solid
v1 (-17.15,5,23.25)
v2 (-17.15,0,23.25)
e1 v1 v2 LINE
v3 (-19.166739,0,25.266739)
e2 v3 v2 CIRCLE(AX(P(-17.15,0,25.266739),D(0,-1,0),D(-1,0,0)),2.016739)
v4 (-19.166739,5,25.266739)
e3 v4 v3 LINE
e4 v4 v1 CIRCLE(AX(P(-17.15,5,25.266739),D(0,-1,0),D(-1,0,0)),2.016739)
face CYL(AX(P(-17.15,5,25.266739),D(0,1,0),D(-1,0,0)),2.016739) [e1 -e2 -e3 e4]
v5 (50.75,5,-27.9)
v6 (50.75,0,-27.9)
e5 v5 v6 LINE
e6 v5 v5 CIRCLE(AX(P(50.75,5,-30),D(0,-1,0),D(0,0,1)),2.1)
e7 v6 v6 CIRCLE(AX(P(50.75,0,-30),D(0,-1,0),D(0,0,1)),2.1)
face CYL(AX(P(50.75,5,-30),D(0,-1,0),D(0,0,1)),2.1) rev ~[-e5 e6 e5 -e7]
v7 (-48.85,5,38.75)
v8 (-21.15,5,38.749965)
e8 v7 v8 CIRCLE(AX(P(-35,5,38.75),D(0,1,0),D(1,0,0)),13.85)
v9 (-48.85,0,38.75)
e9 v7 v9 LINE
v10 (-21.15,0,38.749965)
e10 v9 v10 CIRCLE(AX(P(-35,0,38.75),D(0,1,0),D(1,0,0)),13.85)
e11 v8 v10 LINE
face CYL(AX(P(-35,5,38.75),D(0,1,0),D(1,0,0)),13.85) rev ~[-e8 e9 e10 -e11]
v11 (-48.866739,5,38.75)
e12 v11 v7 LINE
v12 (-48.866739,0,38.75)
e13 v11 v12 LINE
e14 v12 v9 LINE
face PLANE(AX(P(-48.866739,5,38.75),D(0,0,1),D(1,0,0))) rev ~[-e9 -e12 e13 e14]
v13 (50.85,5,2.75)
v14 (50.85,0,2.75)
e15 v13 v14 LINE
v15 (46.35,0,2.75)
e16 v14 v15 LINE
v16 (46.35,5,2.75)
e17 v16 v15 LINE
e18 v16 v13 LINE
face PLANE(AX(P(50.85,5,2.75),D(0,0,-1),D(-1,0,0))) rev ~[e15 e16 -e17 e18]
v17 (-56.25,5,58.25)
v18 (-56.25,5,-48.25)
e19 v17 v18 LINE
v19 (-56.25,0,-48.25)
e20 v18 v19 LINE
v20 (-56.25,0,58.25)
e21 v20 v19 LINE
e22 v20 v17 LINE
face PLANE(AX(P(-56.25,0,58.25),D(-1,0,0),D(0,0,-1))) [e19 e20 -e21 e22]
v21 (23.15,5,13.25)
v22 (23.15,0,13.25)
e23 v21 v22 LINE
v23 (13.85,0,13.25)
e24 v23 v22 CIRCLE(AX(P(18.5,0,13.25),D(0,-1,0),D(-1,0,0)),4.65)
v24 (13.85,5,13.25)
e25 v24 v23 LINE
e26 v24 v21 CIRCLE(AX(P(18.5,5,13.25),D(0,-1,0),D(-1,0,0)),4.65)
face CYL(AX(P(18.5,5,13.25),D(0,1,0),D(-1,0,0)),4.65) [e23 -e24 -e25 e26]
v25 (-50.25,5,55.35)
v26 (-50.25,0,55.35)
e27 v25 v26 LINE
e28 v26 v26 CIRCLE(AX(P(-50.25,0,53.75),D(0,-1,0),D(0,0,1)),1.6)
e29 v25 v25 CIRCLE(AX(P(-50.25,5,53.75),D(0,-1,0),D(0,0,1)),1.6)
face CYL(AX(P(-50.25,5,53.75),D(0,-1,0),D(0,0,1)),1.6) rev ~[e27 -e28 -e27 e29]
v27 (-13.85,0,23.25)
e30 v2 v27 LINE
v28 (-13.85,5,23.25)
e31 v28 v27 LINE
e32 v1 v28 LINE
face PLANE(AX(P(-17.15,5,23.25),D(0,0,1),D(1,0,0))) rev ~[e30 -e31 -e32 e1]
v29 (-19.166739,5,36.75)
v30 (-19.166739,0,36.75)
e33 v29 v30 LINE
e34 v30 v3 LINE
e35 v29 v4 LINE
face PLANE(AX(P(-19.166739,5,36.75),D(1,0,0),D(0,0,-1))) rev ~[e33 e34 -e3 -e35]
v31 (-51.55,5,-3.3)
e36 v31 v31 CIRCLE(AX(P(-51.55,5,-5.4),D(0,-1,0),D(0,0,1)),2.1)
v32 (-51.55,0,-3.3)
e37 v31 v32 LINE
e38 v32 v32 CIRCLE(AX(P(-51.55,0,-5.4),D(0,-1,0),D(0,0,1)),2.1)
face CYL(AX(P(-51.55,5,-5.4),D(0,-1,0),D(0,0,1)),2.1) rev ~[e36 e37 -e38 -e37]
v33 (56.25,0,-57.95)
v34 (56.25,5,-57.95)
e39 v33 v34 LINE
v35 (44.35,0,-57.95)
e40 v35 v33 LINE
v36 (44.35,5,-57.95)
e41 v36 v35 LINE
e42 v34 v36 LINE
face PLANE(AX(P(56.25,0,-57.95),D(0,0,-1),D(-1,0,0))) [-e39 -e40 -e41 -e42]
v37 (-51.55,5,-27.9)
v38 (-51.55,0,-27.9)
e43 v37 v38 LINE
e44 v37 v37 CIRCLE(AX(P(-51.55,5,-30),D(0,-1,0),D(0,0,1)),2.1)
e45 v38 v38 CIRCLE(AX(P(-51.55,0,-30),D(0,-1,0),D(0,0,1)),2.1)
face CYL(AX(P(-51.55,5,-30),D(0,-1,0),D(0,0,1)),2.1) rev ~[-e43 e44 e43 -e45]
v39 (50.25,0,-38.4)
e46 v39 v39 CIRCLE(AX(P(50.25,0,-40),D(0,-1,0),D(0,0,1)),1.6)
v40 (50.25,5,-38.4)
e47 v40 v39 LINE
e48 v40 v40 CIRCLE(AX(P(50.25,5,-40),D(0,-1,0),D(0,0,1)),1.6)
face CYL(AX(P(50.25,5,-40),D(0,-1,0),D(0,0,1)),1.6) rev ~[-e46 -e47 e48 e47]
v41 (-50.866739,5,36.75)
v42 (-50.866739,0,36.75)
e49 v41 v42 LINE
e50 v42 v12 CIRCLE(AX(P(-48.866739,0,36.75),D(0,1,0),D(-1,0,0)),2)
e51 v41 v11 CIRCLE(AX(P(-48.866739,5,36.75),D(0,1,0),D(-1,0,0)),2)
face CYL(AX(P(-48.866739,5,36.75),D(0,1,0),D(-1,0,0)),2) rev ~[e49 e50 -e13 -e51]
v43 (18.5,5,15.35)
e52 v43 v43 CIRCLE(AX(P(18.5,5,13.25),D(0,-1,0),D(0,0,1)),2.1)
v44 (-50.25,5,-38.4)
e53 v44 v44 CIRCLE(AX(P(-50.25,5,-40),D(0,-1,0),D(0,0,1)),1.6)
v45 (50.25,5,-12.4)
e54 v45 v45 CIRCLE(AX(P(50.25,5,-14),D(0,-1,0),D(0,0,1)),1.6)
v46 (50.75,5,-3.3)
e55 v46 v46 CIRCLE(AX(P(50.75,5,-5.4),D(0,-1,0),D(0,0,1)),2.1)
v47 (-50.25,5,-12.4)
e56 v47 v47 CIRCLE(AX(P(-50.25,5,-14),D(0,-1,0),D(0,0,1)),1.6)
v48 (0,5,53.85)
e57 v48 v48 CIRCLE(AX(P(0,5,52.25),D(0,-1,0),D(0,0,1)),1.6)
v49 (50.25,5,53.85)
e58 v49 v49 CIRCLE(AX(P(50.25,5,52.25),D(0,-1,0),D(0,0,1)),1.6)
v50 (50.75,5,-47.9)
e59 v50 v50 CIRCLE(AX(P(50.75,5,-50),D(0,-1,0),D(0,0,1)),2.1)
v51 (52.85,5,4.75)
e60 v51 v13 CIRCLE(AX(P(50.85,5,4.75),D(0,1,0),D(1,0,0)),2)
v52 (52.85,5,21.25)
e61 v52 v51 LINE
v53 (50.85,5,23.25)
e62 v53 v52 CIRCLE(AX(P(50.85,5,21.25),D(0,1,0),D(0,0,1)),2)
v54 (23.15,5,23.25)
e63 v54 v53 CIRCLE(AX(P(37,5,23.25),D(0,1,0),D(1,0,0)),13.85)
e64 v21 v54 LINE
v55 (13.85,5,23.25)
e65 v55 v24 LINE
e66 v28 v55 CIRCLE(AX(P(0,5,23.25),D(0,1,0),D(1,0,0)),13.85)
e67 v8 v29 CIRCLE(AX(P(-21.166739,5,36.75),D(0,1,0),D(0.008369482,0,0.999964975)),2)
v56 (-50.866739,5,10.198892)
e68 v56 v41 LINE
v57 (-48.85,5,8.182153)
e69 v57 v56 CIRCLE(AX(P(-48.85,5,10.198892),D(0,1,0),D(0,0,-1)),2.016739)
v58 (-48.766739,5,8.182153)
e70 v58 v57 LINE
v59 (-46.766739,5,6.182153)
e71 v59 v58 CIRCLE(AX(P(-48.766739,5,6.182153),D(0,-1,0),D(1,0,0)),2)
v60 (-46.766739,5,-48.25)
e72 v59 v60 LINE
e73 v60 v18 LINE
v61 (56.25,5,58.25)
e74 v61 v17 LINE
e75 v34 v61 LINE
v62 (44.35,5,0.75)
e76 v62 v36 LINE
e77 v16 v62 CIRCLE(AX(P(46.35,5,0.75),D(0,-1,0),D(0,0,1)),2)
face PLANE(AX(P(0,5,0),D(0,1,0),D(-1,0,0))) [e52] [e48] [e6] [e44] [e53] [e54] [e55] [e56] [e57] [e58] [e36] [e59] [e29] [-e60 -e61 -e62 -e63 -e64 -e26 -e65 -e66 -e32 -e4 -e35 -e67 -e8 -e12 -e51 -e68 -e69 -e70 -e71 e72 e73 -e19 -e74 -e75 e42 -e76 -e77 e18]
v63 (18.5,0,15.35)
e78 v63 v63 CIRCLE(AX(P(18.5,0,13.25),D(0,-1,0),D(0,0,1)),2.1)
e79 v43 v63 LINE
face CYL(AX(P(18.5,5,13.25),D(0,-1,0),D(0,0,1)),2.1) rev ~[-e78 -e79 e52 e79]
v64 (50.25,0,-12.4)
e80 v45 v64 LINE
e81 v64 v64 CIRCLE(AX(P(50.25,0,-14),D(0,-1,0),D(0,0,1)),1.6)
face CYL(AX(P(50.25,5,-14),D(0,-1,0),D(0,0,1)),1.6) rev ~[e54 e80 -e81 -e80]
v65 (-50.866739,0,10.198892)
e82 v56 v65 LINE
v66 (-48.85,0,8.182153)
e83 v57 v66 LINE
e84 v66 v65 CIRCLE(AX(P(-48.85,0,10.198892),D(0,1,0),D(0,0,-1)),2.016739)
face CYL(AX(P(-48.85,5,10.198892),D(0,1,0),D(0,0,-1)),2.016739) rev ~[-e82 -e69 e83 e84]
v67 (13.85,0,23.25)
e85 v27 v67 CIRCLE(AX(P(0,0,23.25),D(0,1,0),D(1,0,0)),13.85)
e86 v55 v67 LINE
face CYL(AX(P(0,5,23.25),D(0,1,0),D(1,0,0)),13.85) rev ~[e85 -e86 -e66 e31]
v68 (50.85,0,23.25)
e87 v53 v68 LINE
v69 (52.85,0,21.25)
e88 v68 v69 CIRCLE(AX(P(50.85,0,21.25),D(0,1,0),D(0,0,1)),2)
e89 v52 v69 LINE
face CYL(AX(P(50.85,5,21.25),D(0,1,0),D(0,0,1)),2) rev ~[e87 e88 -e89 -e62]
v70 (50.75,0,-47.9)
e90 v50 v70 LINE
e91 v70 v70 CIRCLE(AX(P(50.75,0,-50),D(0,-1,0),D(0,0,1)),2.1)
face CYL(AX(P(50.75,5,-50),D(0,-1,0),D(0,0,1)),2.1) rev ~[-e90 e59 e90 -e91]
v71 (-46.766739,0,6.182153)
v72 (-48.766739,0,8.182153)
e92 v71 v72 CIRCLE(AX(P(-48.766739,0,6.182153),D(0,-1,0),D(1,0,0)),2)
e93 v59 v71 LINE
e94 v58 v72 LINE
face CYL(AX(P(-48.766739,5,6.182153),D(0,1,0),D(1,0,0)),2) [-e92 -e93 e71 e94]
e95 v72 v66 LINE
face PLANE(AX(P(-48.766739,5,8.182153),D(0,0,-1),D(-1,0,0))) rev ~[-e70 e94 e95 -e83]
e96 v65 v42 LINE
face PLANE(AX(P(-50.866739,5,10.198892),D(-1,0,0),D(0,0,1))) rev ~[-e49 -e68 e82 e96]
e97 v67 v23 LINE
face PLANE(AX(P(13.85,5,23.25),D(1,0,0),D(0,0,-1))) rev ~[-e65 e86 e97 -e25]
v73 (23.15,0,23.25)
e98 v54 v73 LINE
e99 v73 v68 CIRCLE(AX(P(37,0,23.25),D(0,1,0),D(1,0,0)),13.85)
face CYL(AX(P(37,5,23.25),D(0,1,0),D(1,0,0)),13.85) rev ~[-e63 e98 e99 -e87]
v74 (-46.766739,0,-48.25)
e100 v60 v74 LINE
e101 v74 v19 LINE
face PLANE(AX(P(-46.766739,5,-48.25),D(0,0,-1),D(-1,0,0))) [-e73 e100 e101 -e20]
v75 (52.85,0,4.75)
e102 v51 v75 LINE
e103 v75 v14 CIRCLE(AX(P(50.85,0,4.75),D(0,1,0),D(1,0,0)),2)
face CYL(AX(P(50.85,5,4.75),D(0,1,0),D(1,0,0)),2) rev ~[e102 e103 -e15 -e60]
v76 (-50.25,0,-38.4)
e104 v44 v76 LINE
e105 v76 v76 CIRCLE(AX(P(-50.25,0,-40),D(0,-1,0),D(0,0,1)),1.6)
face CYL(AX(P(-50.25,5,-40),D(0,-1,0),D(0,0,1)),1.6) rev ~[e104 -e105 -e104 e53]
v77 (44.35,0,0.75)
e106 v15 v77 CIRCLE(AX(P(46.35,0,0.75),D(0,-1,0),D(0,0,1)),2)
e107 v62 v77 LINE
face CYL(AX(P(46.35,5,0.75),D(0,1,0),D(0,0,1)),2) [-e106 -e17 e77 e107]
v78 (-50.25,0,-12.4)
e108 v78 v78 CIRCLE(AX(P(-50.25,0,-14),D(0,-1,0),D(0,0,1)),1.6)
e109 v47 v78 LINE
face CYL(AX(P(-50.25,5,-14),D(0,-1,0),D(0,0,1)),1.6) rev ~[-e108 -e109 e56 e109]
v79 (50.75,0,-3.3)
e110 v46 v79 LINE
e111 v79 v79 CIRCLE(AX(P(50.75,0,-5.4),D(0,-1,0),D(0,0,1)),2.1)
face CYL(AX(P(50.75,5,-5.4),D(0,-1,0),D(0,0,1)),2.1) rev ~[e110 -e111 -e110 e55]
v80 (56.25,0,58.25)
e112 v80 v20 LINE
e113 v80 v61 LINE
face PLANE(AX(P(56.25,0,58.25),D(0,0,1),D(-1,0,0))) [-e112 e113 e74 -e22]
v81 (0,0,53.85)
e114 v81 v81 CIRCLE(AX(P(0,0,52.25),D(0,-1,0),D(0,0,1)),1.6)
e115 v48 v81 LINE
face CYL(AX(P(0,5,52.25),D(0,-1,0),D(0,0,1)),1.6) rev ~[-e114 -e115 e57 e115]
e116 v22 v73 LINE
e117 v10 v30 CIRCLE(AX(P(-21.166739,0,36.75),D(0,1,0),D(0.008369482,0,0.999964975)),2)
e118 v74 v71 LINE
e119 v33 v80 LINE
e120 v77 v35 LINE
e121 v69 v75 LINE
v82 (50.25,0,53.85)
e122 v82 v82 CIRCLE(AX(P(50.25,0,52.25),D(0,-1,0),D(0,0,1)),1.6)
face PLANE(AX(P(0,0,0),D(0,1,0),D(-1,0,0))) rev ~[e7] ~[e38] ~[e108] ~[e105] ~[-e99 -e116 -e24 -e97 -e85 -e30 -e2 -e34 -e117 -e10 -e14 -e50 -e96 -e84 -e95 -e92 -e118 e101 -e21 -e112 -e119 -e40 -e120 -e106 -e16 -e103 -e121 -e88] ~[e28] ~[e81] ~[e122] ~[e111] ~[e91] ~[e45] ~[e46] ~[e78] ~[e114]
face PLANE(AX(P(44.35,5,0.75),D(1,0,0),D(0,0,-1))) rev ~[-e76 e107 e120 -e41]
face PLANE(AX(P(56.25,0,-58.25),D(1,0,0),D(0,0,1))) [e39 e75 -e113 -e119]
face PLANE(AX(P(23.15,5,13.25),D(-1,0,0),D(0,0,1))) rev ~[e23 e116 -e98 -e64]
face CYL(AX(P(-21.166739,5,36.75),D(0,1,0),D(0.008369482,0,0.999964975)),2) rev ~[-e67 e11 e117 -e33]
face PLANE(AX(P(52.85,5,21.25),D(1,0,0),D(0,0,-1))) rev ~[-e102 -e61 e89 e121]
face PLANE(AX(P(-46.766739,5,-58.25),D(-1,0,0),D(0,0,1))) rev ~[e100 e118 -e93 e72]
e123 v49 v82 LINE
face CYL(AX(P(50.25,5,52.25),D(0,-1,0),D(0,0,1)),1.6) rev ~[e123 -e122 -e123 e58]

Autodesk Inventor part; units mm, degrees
ref_plane "YZ Plane" through (0, 0, 0) normal (1, 0, 0) x (0, 1, 0)
ref_plane "XZ Plane" through (0, 0, 0) normal (0, 1, 0) x (-1, 0, 0)
ref_plane "XY Plane" through (0, 0, 0) normal (0, 0, 1) x (1, 0, 0)
sketch "Sketch1" plane through (0, 0, 0) normal (0, 1, 0) x (-1, 0, 0)
  line L0 (-56.25, 58.25) -> (56.25, 58.25)
  line L1 (56.25, 58.25) -> (56.25, -58.25)
  line L2 (56.25, -58.25) -> (-56.25, -58.25)
  line L3 (-56.25, -58.25) -> (-56.25, 58.25)
  line L4 (-56.25, 58.25) -> (56.25, -58.25) construction
  line L5 (56.25, 58.25) -> (-56.25, -58.25) construction
  point P0 (0, 0)
  dimension "d0" = 112.5
  dimension "d1" = 116.5
extrude "Extrusion1" add sketch "Sketch1" along normal blind 5
sketch "Sketch2" plane through (0, 5, 0) normal (0, 1, 0) x (1, 0, 0)
  circle A0 centre (18.5, 28) radius 23.85
  circle A1 centre (37, -23.25) radius 13.85
  circle A2 centre (-35, -38.75) radius 13.85
  circle A3 centre (-30.9, 25.8) radius 13.85
  circle A4 centre (0, -23.25) radius 13.85
  line L0 (56.25, 58.25) -> (-56.25, 58.25)
  line L1 (-56.25, -58.25) -> (56.25, -58.25)
  line L2 (0, -105.929917) -> (0, 123.208568) construction
  line L3 (-76.477668, -38.75) -> (-5.35, -38.75) construction
  line L4 (-123.544744, -23.25) -> (82.557161, -23.25) construction
  line L5 (56.25, -58.25) -> (56.25, 58.25) construction
  point P0 (0, 0)
  dimension "d4" = 47.7
  dimension "d5" = 27.7
  dimension "d6" = 27.7
  dimension "d7" = 27.7
  dimension "d8" = 27.7
  dimension "d9" = 116.5
  dimension "d10" = 112.5
  dimension "d13" = 37
  dimension "d14" = 18.5
  dimension "d15" = 30.9
  dimension "d18" = 19.5
  dimension "d19" = 35
  dimension "d20" = 35
  dimension "d157" = 25.8
  dimension "d158" = 28
extrude "Extrusion2" cut sketch "Sketch2" against normal blind 5
sketch "Sketch3" plane through (0, 5, 0) normal (0, 1, 0) x (1, 0, 0)
  line L0 (-56.266739, 58.25) -> (-56.266739, -58.25) construction
  circle A0 centre (0, -23.25) radius 13.85 construction
  circle A1 centre (37, -23.25) radius 13.85 construction
  circle A2 centre (-30.916739, 25.8) radius 13.85 construction
  line L1 (56.25, 58.25) -> (-56.266739, 58.25) construction
  line L2 (-17.15, -23.25) -> (-13.85, -23.25) construction
  line L3 (-46.75, -8.182153) -> (-46.85, -8.182153)
  line L4 (-13.85, -23.25) -> (-17.15, -23.25)
  line L5 (56.25, -58.25) -> (56.25, 58.25)
  line L6 (-46.85, -8.182153) -> (-46.766739, -8.182153)
  arc A3 (-13.85, -23.25) -> (13.85, -23.25) centre (0, -23.25) ccw
  arc A4 (23.15, -23.25) -> (50.85, -23.25) centre (37, -23.25) ccw
  line L7 (-44.75, 58.25) -> (42.35, 58.25)
  line L8 (-48.866739, -40.25) -> (-48.866739, -40.25)
  line L9 (-50.866739, -38.75) -> (-50.866739, -10.198892)
  line L10 (-48.85, -8.182153) -> (-48.766739, -8.182153)
  arc A5 (-48.85, -8.182153) -> (-50.866739, -10.198892) centre (-48.85, -10.198892) ccw
  line L11 (50.85, -23.25) -> (50.85, -23.25)
  line L12 (52.85, -21.25) -> (52.85, -4.75)
  line L13 (50.85, -2.75) -> (46.35, -2.75)
  arc A6 (50.85, -23.25) -> (52.85, -21.25) centre (50.85, -21.25) ccw
  arc A7 (52.85, -4.75) -> (50.85, -2.75) centre (50.85, -4.75) ccw
  line L14 (-44.751621, 25.8) -> (-44.751621, 25.8)
  line L15 (-46.766739, 28.033923) -> (-46.766739, 58.25)
  line L16 (-44.75, 58.25) -> (-46.766739, 58.25)
  line L17 (-17.073359, 26.228188) -> (-17.056621, 26.228188)
  line L18 (-15.066739, 27.8) -> (-15.066739, 58.25)
  line L19 (-5.349992, 27.98) -> (-5.349991, 27.98)
  line L20 (-7.35, 29.979635) -> (-7.35, 58.25)
  line L21 (42.349991, 27.98) -> (42.35, 27.98)
  line L22 (44.35, 58.25) -> (42.35, 58.25)
  circle A8 centre (0, -23.25) radius 13.85
  circle A9 centre (37, -23.25) radius 13.85
  line L23 (44.35, 58.25) -> (44.35, -0.75)
  line L24 (42.35, 27.98) -> (44.35, 27.98)
  line L25 (-5.349991, 27.98) -> (-5.349999, 27.98)
  line L26 (-7.35, 29.98) -> (-7.35, 29.979635)
  line L27 (-17.056621, 26.228188) -> (-17.056621, 26.228188)
  line L28 (-46.766739, 28.033923) -> (-46.766739, -6.182153)
  arc A10 (-48.766739, -8.182153) -> (-46.766739, -6.182153) centre (-48.766739, -6.182153) ccw
  line L29 (-44.766739, 25.8) -> (-46.766739, 25.8)
  line L30 (-21.15, -40.25) -> (-21.15, -40.25)
  line L31 (-19.166739, -36.75) -> (-19.166739, -25.266739)
  arc A11 (-17.15, -23.25) -> (-19.166739, -25.266739) centre (-17.15, -25.266739) ccw
  line L32 (-17.066739, 25.8) -> (-17.066739, 25.8)
  arc A12 (-17.066739, 25.8) -> (-15.066739, 27.8) centre (-17.066739, 27.8) ccw
  line L33 (-56.266739, -58.25) -> (56.25, -58.25)
  line L34 (56.25, -58.25) -> (56.25, 58.25)
  line L35 (56.25, 58.25) -> (-56.266739, 58.25)
  line L36 (-56.266739, 58.25) -> (-56.266739, -58.25)
  circle A13 centre (-30.916739, 25.8) radius 13.85
  circle A14 centre (-30.916739, 25.8) radius 13.85
  line L37 (13.85, -23.25) -> (13.85, -13.25)
  circle A15 centre (0, -23.25) radius 13.85
  line L38 (23.15, -23.25) -> (23.15, -13.25)
  circle A16 centre (37, -23.25) radius 13.85
  arc A17 (23.15, -13.25) -> (13.85, -13.25) centre (18.5, -13.25) ccw
  circle A18 centre (18.5, 28) radius 23.85
  circle A19 centre (18.5, 28) radius 23.85
  line L39 (56.25, 58.25) -> (-56.266739, 58.25)
  circle A20 centre (-35, -38.75) radius 13.85
  circle A21 centre (-35, -38.75) radius 13.85
  arc A22 (44.35, -0.75) -> (46.35, -2.75) centre (46.35, -0.75) ccw
  line L40 (-5.349999, 27.98) -> (-5.35, 27.98)
  arc A23 (-7.35, 29.98) -> (-5.35, 27.98) centre (-5.35, 29.98) ccw
  line L41 (-56.266739, 58.25) -> (-56.266739, -58.25) construction
  circle A24 centre (-0.016739, -23.25) radius 13.85 construction
  circle A25 centre (36.983261, -23.25) radius 13.85 construction
  circle A26 centre (-30.916739, 25.8) radius 13.85 construction
  line L42 (56.233261, 58.25) -> (-56.266739, 58.25) construction
  line L43 (-17.166739, -23.25) -> (-13.866739, -23.25) construction
  line L44 (-46.75, -8.182153) -> (-46.85, -8.182153)
  line L45 (-13.866739, -23.25) -> (-17.166739, -23.25)
  line L46 (56.233261, -58.25) -> (56.233261, 58.25)
  line L47 (-46.866739, -8.182153) -> (-46.766739, -8.182153)
  arc A27 (-13.866739, -23.25) -> (13.833261, -23.25) centre (-0.016739, -23.25) ccw
  arc A28 (23.133261, -23.25) -> (50.833261, -23.25) centre (36.983261, -23.25) ccw
  line L48 (-44.766739, 58.25) -> (42.333261, 58.25)
  line L49 (-48.85, -40.25) -> (-48.85, -40.25)
  line L50 (-50.866739, -36.75) -> (-50.866739, -10.182153)
  line L51 (-48.866739, -8.182153) -> (-48.766739, -8.182153)
  arc A29 (-48.866739, -8.182153) -> (-50.866739, -10.182153) centre (-48.866739, -10.182153) ccw
  line L52 (50.833261, -23.25) -> (50.833261, -23.25)
  line L53 (52.833261, -21.25) -> (52.833261, -4.75)
  line L54 (50.833261, -2.75) -> (46.333261, -2.75)
  arc A30 (50.833261, -23.25) -> (52.833261, -21.25) centre (50.833261, -21.25) ccw
  arc A31 (52.833261, -4.75) -> (50.833261, -2.75) centre (50.833261, -4.75) ccw
  line L55 (-44.76836, 25.8) -> (-44.76836, 25.8)
  line L56 (-46.766739, 28.033923) -> (-46.766739, 58.25)
  line L57 (-44.766739, 58.25) -> (-46.766739, 58.25)
  line L58 (-17.073359, 26.228188) -> (-17.073359, 26.228188)
  line L59 (-15.066739, 27.8) -> (-15.066739, 58.25)
  line L60 (-5.36673, 27.98) -> (-5.366729, 27.98)
  line L61 (-7.366739, 29.979635) -> (-7.366739, 58.25)
  line L62 (42.333252, 27.98) -> (42.333261, 27.98)
  line L63 (44.333261, 58.25) -> (42.333261, 58.25)
  circle A32 centre (-0.016739, -23.25) radius 13.85
  circle A33 centre (36.983261, -23.25) radius 13.85
  line L64 (44.333261, 58.25) -> (44.333261, -0.75)
  line L65 (42.333261, 27.98) -> (44.333261, 27.98)
  line L66 (-5.366729, 27.98) -> (-5.366738, 27.98)
  line L67 (-7.366739, 29.98) -> (-7.366739, 29.979635)
  line L68 (-17.073359, 26.228188) -> (-17.073359, 26.228188)
  line L69 (-15.066739, 28.002891) -> (-15.066739, 28.002891)
  line L70 (-46.766739, 28.033923) -> (-46.766739, -6.182153)
  arc A34 (-48.766739, -8.182153) -> (-46.766739, -6.182153) centre (-48.766739, -6.182153) ccw
  line L71 (-44.766739, 25.8) -> (-46.766739, 25.8)
  line L72 (-21.15, -40.25) -> (-21.15, -40.25)
  line L73 (-19.166739, -38.25) -> (-19.166739, -25.25)
  arc A35 (-17.166739, -23.25) -> (-19.166739, -25.25) centre (-17.166739, -25.25) ccw
  line L74 (-17.066739, 25.8) -> (-17.066739, 25.8)
  arc A36 (-17.066739, 25.8) -> (-15.066739, 27.8) centre (-17.066739, 27.8) ccw
  line L75 (-56.266739, -58.25) -> (56.233261, -58.25)
  line L76 (56.233261, -58.25) -> (56.233261, 58.25)
  line L77 (56.233261, 58.25) -> (-56.266739, 58.25)
  line L78 (-56.266739, 58.25) -> (-56.266739, -58.25)
  circle A37 centre (-30.9, 25.8) radius 13.833261
  circle A38 centre (-30.9, 25.8) radius 13.833261
  line L79 (13.833261, -23.25) -> (13.833261, -13.25)
  circle A39 centre (-0.016739, -23.25) radius 13.85
  line L80 (23.133261, -23.25) -> (23.133261, -13.25)
  circle A40 centre (36.983261, -23.25) radius 13.85
  arc A41 (23.133261, -13.25) -> (13.833261, -13.25) centre (18.483261, -13.25) ccw
  circle A42 centre (18.483261, 28) radius 23.85
  circle A43 centre (18.483261, 28) radius 23.85
  line L81 (56.233261, 58.25) -> (-56.266739, 58.25)
  circle A44 centre (-35, -38.75) radius 13.85
  arc A45 (44.333261, -0.75) -> (46.333261, -2.75) centre (46.333261, -0.75) ccw
  line L82 (-5.366738, 27.98) -> (-5.366739, 27.98)
  arc A46 (-7.366739, 29.98) -> (-5.366739, 27.98) centre (-5.366739, 29.98) ccw
  circle A47 centre (18.5, 28) radius 23.85
  circle A48 centre (37, -23.25) radius 13.85
  circle A49 centre (-30.9, 25.8) radius 13.85
  circle A50 centre (0, -23.25) radius 13.85
  circle A51 centre (-35, -38.75) radius 13.85
  line L83 (56.25, 58.25) -> (-56.25, 58.25)
  line L84 (-56.25, 58.25) -> (-56.25, -58.25)
  line L85 (-56.25, -58.25) -> (56.25, -58.25)
  line L86 (56.25, -58.25) -> (56.25, 58.25)
  line L87 (-48.866739, -38.75) -> (-21.166739, -38.75)
  line L88 (-56.25, 58.25) -> (-56.25, -58.25)
  line L89 (-56.25, -58.25) -> (56.25, -58.25)
  line L90 (56.25, -58.25) -> (56.25, 58.25)
  line L91 (56.25, 58.25) -> (-56.25, 58.25)
  circle A52 centre (-30.9, 25.8) radius 13.85
  circle A53 centre (18.5, 28) radius 23.85
  circle A54 centre (-35, -38.75) radius 13.85
  circle A55 centre (0, -23.25) radius 13.85
  circle A56 centre (37, -23.25) radius 13.85
  arc A57 (-21.166739, -38.75) -> (-19.166739, -36.75) centre (-21.166739, -36.75) ccw
  arc A58 (-50.866739, -36.75) -> (-48.866739, -38.75) centre (-48.866739, -36.75) ccw
  point P0 (18.5, 27.979635)
  point P1 (-30.9, 25.819804)
  point P2 (-0.016739, 0)
  point P3 (0, 0)
  point P4 (44.35, -2.75)
  point P5 (52.85, -23.25)
  point P6 (-15.066739, 28.002891)
  point P7 (-15.066739, 28.002891)
  point P8 (50.85, -23.25)
  point P9 (-19.166739, -38.25)
  point P10 (50.85, -23.25)
  point P11 (-46.75, 58.25)
  point P12 (-46.75, 58.25)
  point P13 (50.85, -23.25)
  point P14 (-44.75, 25.8)
  point P15 (-17.05, 25.8)
  point P16 (-7.35, 27.98)
  point P17 (-7.35, 29.98)
  point P18 (-21.15, -40.25)
  point P19 (-0.016739, 0)
  point P20 (-0.016739, 0)
  point P21 (44.333261, -2.75)
  point P22 (52.833261, -23.25)
  point P23 (50.85, -23.25)
  point P24 (50.85, -23.25)
  point P25 (-46.75, 58.25)
  point P26 (-46.75, 58.25)
  point P27 (50.85, -23.25)
  point P28 (-44.75, 25.8)
  point P29 (-17.05, 25.8)
  point P30 (-7.366739, 27.98)
  point P31 (-7.35, 29.98)
  point P32 (-21.15, -40.25)
  point P33 (42.35, 28)
  point P34 (-5.349998, 27.989818)
  point P35 (13.85, -23.25)
  point P36 (50.85, -23.25)
  point P37 (-30.908369, 11.950003)
  point P38 (-30.908369, 39.649997)
  point P39 (-19.166739, -38.75)
  point P40 (50.85, -23.24993)
  point P41 (-48.85, -38.75)
  point P42 (-21.15, -38.74993)
  dimension "d95" = 27.7
  dimension "d96" = 27.7
  dimension "d134" = 27.7
  dimension "d135" = 27.7
  dimension "d81" = 2
  dimension "d82" = 2
  dimension "d83" = 2
  dimension "d84" = 2
  dimension "d86" = 2
  dimension "d87" = 2
  dimension "d88" = 27.7
  dimension "d89" = 10
  dimension "d90" = 10
  dimension "d91" = 25.8
  dimension "d92" = 23.25
  dimension "d93" = 23.25
  dimension "d94" = 37
  dimension "d97" = 19.15
  dimension "d98" = 50.85
  dimension "d99" = 46.75
  dimension "d100" = 2.017
  dimension "d101" = 6.18215
  dimension "d102" = 31.7
  dimension "d103" = 51.7
  dimension "d104" = 30.9
  dimension "d105" = 3.4
  dimension "d106" = 11.9
  dimension "d107" = 61
  dimension "d108" = 47.7
  dimension "d109" = 28
  dimension "d110" = 18.5
  dimension "d111" = 30.27
  dimension "d112" = 27.7
  dimension "d113" = 2
  dimension "d114" = 30.27
  dimension "d115" = 2
  dimension "d116" = 112.51674
  dimension "d117" = 116.5
  dimension "d120" = 2
  dimension "d121" = 2
  dimension "d122" = 2
  dimension "d123" = 2
  dimension "d125" = 2
  dimension "d126" = 2
  dimension "d127" = 27.7
  dimension "d128" = 10
  dimension "d129" = 10
  dimension "d130" = 25.8
  dimension "d131" = 23.25
  dimension "d132" = 23.25
  dimension "d133" = 37
  dimension "d136" = 19.15
  dimension "d137" = 50.85
  dimension "d138" = 46.75
  dimension "d139" = 2
  dimension "d140" = 6.18215
  dimension "d141" = 31.7
  dimension "d142" = 51.7
  dimension "d143" = 30.88326
  dimension "d144" = 3.4
  dimension "d145" = 11.9
  dimension "d146" = 61
  dimension "d147" = 47.7
  dimension "d148" = 28
  dimension "d149" = 18.5
  dimension "d150" = 30.27
  dimension "d152" = 2
  dimension "d153" = 30.27
sketch "Sketch3 outline for Extrusion3" plane through (0, 5, 0) normal (0, 1, 0) x (1, 0, 0)
  arc A0 (23.15, -23.25) -> (50.85, -23.25) centre (37, -23.25) cw
  line L0 (23.15, -13.25) -> (23.15, -23.25)
  arc A1 (50.85, -23.25) -> (52.85, -21.25) centre (50.85, -21.25) ccw
  arc A2 (13.85, -13.25) -> (23.15, -13.25) centre (18.5, -13.25) cw
  line L1 (52.85, -21.25) -> (52.85, -4.75)
  line L2 (13.85, -23.25) -> (13.85, -13.25)
  arc A3 (52.85, -4.75) -> (50.85, -2.75) centre (50.85, -4.75) ccw
  arc A4 (-13.85, -23.25) -> (13.85, -23.25) centre (0, -23.25) cw
  line L3 (50.85, -2.75) -> (50.833261, -2.75)
  line L4 (-17.15, -23.25) -> (-13.85, -23.25)
  line L5 (50.833261, -2.75) -> (46.35, -2.75)
  arc A5 (-19.166739, -25.266739) -> (-17.15, -23.25) centre (-17.15, -25.266739) cw
  arc A6 (46.35, -2.75) -> (44.35, -0.75) centre (46.35, -0.75) cw
  line L6 (-19.166739, -36.75) -> (-19.166739, -25.266739)
  line L7 (44.35, -0.75) -> (44.35, 58.25)
  arc A7 (-21.15, -38.74993) -> (-19.166739, -36.75) centre (-21.166739, -36.75) ccw
  line L8 (44.35, 58.25) -> (44.333261, 58.25)
  arc A8 (-48.85, -38.75) -> (-21.15, -38.74993) centre (-35, -38.75) cw
  line L9 (44.333261, 58.25) -> (42.333261, 58.25)
  line L10 (-48.866739, -38.75) -> (-48.85, -38.75)
  line L11 (42.333261, 58.25) -> (-44.766739, 58.25)
  arc A9 (-50.866739, -36.75) -> (-48.866739, -38.75) centre (-48.866739, -36.75) ccw
  line L12 (-44.766739, 58.25) -> (-46.766739, 58.25)
  line L13 (-50.866739, -10.198892) -> (-50.866739, -36.75)
  line L14 (-46.766739, 58.25) -> (-46.766739, 28.033923)
  arc A10 (-48.85, -8.182153) -> (-50.866739, -10.198892) centre (-48.85, -10.198892) ccw
  line L15 (-46.766739, 28.033923) -> (-46.766739, -6.182153)
  line L16 (-48.766739, -8.182153) -> (-48.85, -8.182153)
  arc A11 (-46.766739, -6.182153) -> (-48.766739, -8.182153) centre (-48.766739, -6.182153) cw
  arc A12 (-30.908369, 39.649997) -> (-30.908369, 11.950003) centre (-30.916739, 25.8) cw
  arc A13 (-30.908369, 11.950003) -> (-30.908369, 39.649997) centre (-30.9, 25.8) cw
  arc A14 (-5.349998, 27.989818) -> (42.35, 28) centre (18.5, 28) cw
  arc A15 (42.35, 28) -> (-5.349998, 27.989818) centre (18.5, 28) cw
extrude "Extrusion3" cut sketch "Sketch3 outline for Extrusion3" against normal blind 5
sketch "Sketch4" plane through (0, 5, 0) normal (0, 1, 0) x (1, 0, 0)
  line L0 (-56.25, 58.25) -> (-56.25, -58.25)
  line L1 (56.25, -58.25) -> (56.25, 58.25)
  line L2 (-51.55, 5.4) -> (-51.55, 71.994123) construction
  line L3 (50.75, 5.4) -> (50.75, 69.456542) construction
  line L4 (-73.721988, 50) -> (66.546719, 50) construction
  line L5 (66.546719, 30) -> (-76.077923, 30) construction
  line L6 (18.5, -1.340599) -> (18.5, -39.445861) construction
  line L7 (6.353115, -13.25) -> (33.621097, -13.25) construction
  point P0 (0, 0)
  point P1 (-51.55, 30)
  point P2 (50.75, 50)
  point P3 (50.75, 30)
  point P4 (18.5, -13.25)
  dimension "d48" = 4.7
  dimension "d49" = 5.5
  dimension "d58" = 30
  dimension "d59" = 50
  dimension "d72" = 5.4
  dimension "d73" = 5.4
hole "Hole1" at (-51.55, 5, -5.4) at (50.75, 5, -5.4) at (-51.55, 5, -30) at (50.75, 5, -50) at (50.75, 5, -30) at (18.5, 5, 13.25) direction (0, -1, 0) diameter 4.2 end through all
sketch "Sketch5" plane through (0, 5, 0) normal (0, 1, 0) x (1, 0, 0)
  line L0 (-50.25, 75.94977) -> (-50.25, -88.006053) construction
  line L1 (-63.914485, -52.25) -> (79.409686, -52.25) construction
  line L2 (50.25, 66.292399) -> (50.25, -77.90971) construction
  line L3 (-56.25, 58.25) -> (-56.25, -58.25) construction
  line L4 (-56.25, -58.25) -> (56.25, -58.25) construction
  line L5 (56.25, -58.25) -> (56.25, 58.25) construction
  line L6 (-71.815971, 40) -> (84.238372, 40) construction
  line L7 (-70.718543, 14) -> (79.409686, 14) construction
  point P0 (0, 0)
  point P1 (-50.25, 40)
  point P2 (-50.25, 14)
  point P3 (-50.25, -53.75)
  point P4 (50.25, -52.25)
  point P5 (0, -52.25)
  point P6 (50.25, 14)
  point P7 (50.25, 40)
  dimension "d1" = 116.5
  dimension "d60" = 6
  dimension "d61" = 6
  dimension "d62" = 6
  dimension "d63" = 14
  dimension "d64" = 40
  dimension "d162" = 58.25
  dimension "d163" = 4.5
hole "Hole2" at (-50.25, 5, -40) at (-50.25, 5, -14) at (-50.25, 5, 53.75) at (50.25, 5, 52.25) at (0, 5, 52.25) at (50.25, 5, -14) at (50.25, 5, -40) direction (0, -1, 0) diameter 3.2 end through all
sketch "Sketch6" plane through (0, 5, 0) normal (0, 1, 0) x (1, 0, 0)
  line L0 (56.25, 58.25) -> (-56.25, 58.25)
  line L1 (-56.25, 58.25) -> (-46.766739, 58.25)
  line L2 (-46.766739, 58.25) -> (-46.766739, 48.25)
  line L3 (-46.766739, 48.25) -> (-56.25, 48.25)
  line L4 (-56.25, 48.25) -> (-56.25, 58.25)
  line L5 (-56.25, 58.25) -> (-56.25, -58.25)
  line L6 (-46.766739, -6.182153) -> (-46.766739, 58.25)
  point P0 (0, 0)
  point P1 (-46.75, 58.25)
  dimension "d159" = 10
extrude "Extrusion4" cut sketch "Sketch6" against normal blind 10
sketch "Sketch7" plane through (56.25, 0, -58.25) normal (0, 0, -1) x (-1, 0, 0)
  line L0 (0, 0) -> (0, 5) projected
  line L1 (11.9, 5) -> (11.9, 0) projected
  line L2 (0, 5) -> (11.9, 5)
  line L3 (11.9, 5) -> (11.9, 0)
  line L4 (11.9, 0) -> (0, 0)
  line L5 (0, 0) -> (0, 5)
  point P0 (56.25, 0)
extrude "Extrusion5" cut sketch "Sketch7" against normal blind 0.3
properties part number "Bottle layout"
